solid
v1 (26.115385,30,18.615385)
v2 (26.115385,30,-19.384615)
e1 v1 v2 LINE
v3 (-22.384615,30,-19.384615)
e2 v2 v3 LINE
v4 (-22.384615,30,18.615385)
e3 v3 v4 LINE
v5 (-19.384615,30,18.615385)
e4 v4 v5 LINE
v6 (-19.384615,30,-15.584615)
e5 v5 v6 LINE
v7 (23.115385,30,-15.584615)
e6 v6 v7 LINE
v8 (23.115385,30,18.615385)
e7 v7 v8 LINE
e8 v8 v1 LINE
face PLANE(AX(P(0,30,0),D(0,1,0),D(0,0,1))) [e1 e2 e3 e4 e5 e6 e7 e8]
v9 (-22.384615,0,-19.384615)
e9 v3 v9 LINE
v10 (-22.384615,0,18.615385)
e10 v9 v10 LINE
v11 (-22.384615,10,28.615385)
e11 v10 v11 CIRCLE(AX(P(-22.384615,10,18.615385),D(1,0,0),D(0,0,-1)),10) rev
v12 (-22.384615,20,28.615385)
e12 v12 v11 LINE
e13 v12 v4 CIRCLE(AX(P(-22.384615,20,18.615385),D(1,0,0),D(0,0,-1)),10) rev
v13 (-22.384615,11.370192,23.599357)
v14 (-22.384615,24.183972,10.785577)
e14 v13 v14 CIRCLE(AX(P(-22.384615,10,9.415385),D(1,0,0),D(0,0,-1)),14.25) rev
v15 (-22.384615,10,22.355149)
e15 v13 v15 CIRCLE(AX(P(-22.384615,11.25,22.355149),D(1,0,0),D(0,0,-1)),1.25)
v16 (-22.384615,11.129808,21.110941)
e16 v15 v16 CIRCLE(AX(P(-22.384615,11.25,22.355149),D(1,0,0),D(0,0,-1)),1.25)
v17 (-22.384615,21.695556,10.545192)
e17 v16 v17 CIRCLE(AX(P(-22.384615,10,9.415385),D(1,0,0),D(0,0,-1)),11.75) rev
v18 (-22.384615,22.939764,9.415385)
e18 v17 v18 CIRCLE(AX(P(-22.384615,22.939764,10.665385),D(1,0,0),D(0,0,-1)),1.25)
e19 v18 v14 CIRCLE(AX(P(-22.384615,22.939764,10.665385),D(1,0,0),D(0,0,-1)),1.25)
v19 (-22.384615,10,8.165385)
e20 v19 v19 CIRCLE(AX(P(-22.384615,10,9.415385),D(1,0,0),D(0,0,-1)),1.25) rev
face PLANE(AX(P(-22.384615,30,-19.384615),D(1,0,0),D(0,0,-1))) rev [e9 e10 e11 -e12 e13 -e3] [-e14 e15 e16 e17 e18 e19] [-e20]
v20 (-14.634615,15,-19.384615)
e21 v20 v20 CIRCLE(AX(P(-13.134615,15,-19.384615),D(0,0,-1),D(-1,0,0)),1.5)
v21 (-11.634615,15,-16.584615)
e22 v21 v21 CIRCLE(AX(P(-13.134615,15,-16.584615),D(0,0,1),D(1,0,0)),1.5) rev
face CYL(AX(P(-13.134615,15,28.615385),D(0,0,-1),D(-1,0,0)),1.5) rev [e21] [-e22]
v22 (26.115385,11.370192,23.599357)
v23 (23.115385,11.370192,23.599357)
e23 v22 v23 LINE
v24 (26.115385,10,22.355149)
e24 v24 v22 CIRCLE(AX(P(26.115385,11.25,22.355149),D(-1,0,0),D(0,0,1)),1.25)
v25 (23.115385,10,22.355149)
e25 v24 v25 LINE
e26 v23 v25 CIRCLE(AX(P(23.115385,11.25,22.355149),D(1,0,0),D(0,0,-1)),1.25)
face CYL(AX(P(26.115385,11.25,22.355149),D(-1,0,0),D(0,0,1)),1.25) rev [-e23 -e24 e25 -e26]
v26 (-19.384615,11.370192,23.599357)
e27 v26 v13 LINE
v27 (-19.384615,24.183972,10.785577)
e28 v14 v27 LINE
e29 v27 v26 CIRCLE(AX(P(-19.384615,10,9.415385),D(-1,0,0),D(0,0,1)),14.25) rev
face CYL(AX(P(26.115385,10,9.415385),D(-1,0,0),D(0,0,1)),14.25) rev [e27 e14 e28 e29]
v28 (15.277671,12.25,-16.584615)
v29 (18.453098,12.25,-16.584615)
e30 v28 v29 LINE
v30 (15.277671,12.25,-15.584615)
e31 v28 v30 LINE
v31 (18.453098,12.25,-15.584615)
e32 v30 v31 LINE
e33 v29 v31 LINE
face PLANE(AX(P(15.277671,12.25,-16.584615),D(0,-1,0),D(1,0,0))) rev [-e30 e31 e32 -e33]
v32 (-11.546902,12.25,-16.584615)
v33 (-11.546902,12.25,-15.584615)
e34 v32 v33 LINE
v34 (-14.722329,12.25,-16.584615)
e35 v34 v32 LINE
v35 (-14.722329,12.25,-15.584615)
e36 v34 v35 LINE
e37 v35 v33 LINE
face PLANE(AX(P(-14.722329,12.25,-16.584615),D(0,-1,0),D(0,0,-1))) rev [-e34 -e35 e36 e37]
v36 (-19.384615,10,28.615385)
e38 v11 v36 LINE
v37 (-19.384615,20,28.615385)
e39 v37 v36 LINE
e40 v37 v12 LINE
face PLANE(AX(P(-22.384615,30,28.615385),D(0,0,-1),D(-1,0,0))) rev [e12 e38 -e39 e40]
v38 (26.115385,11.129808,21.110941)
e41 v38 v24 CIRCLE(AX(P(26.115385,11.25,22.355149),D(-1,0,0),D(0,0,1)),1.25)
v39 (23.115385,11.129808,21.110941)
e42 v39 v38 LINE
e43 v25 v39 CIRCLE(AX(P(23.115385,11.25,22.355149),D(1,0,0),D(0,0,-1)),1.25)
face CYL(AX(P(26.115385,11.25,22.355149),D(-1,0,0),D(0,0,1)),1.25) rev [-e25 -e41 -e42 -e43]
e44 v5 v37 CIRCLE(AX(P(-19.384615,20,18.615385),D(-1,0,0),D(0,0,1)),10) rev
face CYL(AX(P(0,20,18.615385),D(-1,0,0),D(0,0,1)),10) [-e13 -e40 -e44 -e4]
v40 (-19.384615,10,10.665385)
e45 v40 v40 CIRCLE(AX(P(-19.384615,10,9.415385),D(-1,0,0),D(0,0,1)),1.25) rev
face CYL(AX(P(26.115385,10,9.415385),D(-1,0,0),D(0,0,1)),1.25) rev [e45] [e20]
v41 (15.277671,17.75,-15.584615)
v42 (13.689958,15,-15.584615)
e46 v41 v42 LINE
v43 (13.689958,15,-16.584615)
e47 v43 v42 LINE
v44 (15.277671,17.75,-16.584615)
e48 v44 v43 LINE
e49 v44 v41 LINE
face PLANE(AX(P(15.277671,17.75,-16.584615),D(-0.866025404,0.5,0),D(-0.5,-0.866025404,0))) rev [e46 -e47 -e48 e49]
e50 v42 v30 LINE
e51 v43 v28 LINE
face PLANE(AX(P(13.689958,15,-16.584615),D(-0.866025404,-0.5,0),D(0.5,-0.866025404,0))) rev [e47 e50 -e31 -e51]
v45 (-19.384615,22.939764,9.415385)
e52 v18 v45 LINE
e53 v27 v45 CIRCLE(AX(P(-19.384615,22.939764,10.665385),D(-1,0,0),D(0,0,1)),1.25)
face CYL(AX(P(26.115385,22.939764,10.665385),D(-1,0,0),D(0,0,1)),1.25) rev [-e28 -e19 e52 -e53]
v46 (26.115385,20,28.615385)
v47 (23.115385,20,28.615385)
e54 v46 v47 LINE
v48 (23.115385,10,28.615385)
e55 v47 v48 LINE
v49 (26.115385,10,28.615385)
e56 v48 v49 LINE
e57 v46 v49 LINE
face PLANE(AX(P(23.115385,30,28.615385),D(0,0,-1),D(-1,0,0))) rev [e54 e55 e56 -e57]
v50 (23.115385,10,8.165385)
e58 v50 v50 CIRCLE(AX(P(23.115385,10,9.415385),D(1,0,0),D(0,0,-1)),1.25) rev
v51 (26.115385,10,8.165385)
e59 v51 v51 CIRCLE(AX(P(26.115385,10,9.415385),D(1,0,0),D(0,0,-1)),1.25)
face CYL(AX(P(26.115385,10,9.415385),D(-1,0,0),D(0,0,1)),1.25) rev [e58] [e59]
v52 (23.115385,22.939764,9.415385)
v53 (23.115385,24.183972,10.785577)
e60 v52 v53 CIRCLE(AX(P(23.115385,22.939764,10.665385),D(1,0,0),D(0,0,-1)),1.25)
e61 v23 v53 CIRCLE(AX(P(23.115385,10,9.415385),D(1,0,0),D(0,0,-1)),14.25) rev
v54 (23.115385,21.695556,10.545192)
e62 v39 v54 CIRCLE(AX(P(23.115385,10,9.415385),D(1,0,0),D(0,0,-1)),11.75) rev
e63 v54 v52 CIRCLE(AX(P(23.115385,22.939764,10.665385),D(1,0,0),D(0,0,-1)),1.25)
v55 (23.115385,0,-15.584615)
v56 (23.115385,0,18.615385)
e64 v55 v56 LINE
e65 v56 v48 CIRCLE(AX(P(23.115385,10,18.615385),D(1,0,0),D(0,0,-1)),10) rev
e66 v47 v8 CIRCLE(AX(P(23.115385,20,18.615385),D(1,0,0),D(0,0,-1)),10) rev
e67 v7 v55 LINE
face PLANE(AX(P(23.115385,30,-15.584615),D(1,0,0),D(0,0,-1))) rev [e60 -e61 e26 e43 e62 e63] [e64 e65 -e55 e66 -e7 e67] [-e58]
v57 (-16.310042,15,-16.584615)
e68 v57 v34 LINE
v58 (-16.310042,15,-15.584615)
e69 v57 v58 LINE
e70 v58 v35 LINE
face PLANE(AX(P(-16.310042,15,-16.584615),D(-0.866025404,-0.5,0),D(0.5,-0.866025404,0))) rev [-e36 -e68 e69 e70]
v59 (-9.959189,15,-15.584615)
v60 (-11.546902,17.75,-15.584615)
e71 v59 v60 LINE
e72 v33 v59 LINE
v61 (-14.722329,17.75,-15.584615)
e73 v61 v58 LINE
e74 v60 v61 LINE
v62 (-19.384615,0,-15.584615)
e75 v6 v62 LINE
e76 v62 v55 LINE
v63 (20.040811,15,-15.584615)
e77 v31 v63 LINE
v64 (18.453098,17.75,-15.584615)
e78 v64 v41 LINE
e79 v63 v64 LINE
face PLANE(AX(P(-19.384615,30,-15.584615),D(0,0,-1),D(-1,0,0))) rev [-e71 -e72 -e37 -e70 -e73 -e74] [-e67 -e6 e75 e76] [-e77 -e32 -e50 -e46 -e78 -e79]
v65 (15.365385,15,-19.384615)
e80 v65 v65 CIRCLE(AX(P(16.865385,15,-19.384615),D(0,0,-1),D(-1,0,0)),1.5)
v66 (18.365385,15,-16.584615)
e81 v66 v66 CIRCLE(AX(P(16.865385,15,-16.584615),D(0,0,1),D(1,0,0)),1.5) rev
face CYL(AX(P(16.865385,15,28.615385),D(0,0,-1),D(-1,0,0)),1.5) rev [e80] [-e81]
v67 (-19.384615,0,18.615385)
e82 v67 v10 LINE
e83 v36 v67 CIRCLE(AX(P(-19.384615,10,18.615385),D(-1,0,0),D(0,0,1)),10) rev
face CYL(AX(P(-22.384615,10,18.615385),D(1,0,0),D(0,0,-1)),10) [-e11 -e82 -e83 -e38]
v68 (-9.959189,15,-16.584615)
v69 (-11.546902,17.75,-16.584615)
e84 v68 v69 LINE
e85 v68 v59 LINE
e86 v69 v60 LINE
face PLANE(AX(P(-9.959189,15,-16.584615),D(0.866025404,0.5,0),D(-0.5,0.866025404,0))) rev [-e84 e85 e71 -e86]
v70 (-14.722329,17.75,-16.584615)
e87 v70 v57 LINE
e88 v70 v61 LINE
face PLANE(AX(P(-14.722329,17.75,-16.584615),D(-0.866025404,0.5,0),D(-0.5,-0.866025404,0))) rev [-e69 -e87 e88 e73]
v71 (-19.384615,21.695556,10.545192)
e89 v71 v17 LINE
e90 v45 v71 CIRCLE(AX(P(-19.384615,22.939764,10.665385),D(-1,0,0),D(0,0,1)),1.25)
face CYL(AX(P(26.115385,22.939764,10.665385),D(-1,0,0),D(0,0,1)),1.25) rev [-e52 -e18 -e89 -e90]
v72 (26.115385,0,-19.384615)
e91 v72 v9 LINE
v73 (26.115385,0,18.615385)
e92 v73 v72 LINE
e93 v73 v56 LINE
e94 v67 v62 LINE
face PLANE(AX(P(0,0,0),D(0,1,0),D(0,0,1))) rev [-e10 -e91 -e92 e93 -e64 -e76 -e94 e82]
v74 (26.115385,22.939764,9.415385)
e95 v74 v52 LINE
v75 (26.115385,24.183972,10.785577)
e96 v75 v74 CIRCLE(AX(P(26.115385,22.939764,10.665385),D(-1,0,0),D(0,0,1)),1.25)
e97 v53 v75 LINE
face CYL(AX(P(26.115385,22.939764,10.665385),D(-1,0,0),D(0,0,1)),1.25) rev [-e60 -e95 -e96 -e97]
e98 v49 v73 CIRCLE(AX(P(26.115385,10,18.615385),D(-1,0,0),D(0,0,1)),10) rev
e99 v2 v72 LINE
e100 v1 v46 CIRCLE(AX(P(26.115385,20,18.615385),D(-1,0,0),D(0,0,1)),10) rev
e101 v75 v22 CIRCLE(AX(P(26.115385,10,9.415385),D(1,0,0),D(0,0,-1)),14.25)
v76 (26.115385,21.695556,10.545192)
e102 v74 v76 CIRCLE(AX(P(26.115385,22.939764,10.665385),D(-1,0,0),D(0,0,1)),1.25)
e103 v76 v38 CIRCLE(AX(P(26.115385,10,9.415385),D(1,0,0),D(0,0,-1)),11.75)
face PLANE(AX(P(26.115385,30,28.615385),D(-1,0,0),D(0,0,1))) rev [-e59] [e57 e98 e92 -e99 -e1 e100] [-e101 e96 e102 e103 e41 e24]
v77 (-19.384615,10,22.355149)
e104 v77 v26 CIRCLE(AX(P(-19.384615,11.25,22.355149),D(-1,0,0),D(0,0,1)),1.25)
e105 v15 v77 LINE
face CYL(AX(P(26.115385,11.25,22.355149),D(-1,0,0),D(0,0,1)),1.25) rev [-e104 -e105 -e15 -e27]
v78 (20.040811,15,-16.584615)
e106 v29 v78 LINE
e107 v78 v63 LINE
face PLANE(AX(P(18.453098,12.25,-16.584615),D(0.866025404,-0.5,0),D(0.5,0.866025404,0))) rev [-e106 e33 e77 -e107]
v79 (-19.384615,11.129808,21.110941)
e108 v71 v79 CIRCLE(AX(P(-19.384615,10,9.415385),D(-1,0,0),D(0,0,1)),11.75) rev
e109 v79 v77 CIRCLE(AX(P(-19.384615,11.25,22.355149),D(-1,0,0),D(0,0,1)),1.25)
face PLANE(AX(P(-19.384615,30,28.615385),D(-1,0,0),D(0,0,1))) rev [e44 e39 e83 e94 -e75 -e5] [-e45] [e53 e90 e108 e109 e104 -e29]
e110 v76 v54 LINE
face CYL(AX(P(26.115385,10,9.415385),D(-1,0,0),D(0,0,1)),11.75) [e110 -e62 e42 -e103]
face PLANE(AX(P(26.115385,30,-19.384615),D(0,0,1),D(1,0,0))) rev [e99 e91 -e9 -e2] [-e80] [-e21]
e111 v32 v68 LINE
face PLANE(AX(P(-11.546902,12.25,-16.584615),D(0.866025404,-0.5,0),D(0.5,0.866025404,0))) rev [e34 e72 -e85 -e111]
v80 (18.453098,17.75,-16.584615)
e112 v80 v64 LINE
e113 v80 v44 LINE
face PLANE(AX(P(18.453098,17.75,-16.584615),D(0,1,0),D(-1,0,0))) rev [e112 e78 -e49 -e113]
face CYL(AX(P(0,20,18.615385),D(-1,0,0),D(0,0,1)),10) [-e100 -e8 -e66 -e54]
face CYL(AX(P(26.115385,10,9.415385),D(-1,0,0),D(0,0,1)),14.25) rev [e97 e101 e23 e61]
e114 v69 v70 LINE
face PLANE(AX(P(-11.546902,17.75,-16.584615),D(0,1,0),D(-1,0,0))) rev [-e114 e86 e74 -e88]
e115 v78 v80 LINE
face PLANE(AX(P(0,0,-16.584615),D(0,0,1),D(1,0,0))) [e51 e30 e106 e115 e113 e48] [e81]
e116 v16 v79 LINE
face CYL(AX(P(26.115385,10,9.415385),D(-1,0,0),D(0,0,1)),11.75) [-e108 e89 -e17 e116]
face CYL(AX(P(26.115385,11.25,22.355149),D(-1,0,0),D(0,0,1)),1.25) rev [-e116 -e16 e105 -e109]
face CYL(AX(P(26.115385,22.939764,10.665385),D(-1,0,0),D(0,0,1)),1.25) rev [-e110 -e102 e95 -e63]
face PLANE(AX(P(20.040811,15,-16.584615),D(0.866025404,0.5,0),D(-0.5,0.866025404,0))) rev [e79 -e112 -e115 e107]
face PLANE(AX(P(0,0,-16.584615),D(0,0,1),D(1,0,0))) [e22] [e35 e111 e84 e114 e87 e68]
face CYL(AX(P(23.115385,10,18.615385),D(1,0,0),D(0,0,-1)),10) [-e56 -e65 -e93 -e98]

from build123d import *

# Parameters (mm, degrees)
BOSS_EXTRUDE1_DEPTH     = 30
CUT_EXTRUDE1_DEPTH      = 62.55558656
CUT_EXTRUDE1_DEPTH_BACK = 10
SKETCH4_R               = 1.5
CUT_EXTRUDE2_DEPTH      = 63.337896288
FILLET1_R               = 1.25
FILLET2_R               = 10
CUT_EXTRUDE3_DEPTH      = 1


with BuildPart() as part:
    # Sketch2 → Boss-Extrude1 (new body)
    with BuildSketch(Plane(origin=(0, 0, 0), x_dir=(1, 0, 0), z_dir=(0, 1, 0))):
        Polygon((26.115384615, 19.384615385), (-22.384615385, 19.384615385), (-22.384615385, -28.615384615), (-19.384615385, -28.615384615), (-19.384615385, 15.584615385), (23.115384615, 15.584615385), (23.115384615, -28.615384615), (26.115384615, -28.615384615), align=None)
    extrude(amount=BOSS_EXTRUDE1_DEPTH)

    # Sketch3 → Cut-Extrude1 (cut, two sides: drawn at the far end of the back side and taken through both)
    with BuildSketch(Plane(origin=(-19.384615385, 0, 0), x_dir=(0, 0, -1), z_dir=(1, 0, 0)).offset(-CUT_EXTRUDE1_DEPTH_BACK)):
        with BuildLine():
            ThreePointArc((-21.165384615, 10), (-17.723889294, 18.308504679), (-9.415384615, 21.75))
            Line((-9.415384615, 21.75), (-9.415384615, 24.25))
            ThreePointArc((-9.415384615, 24.25), (-19.491656247, 20.076271632), (-23.665384615, 10))
            Line((-23.665384615, 10), (-21.165384615, 10))
        make_face()
        with BuildLine():
            Line((-10.665384615, 10), (-9.415384615, 10))
            Line((-9.415384615, 10), (-9.415384615, 11.25))
            ThreePointArc((-9.415384615, 11.25), (-10.299268092, 10.883883476), (-10.665384615, 10))
        make_face()
        with BuildLine():
            Line((-9.415384615, 11.25), (-9.415384615, 10))
            Line((-9.415384615, 10), (-10.665384615, 10))
            ThreePointArc((-10.665384615, 10), (-9.415384615, 8.75), (-8.165384615, 10))
            ThreePointArc((-8.165384615, 10), (-8.531501139, 10.883883476), (-9.415384615, 11.25))
        make_face()
    extrude(amount=CUT_EXTRUDE1_DEPTH + CUT_EXTRUDE1_DEPTH_BACK, mode=Mode.SUBTRACT)

    # Sketch4 → Cut-Extrude2 (cut, through all)
    with BuildSketch(Plane(origin=(0, 0, -19.384615385), x_dir=(-1, 0, 0), z_dir=(0, 0, -1))):
        with Locations((-16.865384615, 15)):
            Circle(SKETCH4_R)
        with Locations((13.134615385, 15)):
            Circle(SKETCH4_R)
    extrude(amount=-CUT_EXTRUDE2_DEPTH, mode=Mode.SUBTRACT)

    # Fillet1
    fillet1_edges = [part.edges().sort_by_distance(p)[0] for p in [
        (-20.884615385, 24.25, 9.415384615),
        (-20.884615385, 21.75, 9.415384615),
        (-20.884615385, 10, 21.165384615),
        (-20.884615385, 10, 23.665384615),
        (24.615384615, 10, 23.665384615),
        (24.615384615, 10, 21.165384615),
        (24.615384615, 21.75, 9.415384615),
        (24.615384615, 24.25, 9.415384615),
    ]]
    fillet(fillet1_edges, radius=FILLET1_R - 0.0001)  # a hair under: the kernel refuses the full size

    # Fillet2
    fillet2_edges = [part.edges().sort_by_distance(p)[0] for p in [
        (-20.884615385, 30, 28.615384615),
        (24.615384615, 30, 28.615384615),
        (24.615384615, 0, 28.615384615),
        (-20.884615385, 0, 28.615384615),
    ]]
    fillet(fillet2_edges, radius=FILLET2_R)

    # Sketch5 → Cut-Extrude3 (cut)
    with BuildSketch(Plane.XY.offset(-15.584615385)):
        Polygon((-14.722328625, 12.25), (-11.546902144, 12.25), (-9.959188904, 15), (-11.546902144, 17.75), (-14.722328625, 17.75), (-16.310041865, 15), align=None)
        Polygon((15.277671375, 12.25), (18.453097856, 12.25), (20.040811096, 15), (18.453097856, 17.75), (15.277671375, 17.75), (13.689958135, 15), align=None)
    extrude(amount=-CUT_EXTRUDE3_DEPTH, mode=Mode.SUBTRACT)


solid = part.part
